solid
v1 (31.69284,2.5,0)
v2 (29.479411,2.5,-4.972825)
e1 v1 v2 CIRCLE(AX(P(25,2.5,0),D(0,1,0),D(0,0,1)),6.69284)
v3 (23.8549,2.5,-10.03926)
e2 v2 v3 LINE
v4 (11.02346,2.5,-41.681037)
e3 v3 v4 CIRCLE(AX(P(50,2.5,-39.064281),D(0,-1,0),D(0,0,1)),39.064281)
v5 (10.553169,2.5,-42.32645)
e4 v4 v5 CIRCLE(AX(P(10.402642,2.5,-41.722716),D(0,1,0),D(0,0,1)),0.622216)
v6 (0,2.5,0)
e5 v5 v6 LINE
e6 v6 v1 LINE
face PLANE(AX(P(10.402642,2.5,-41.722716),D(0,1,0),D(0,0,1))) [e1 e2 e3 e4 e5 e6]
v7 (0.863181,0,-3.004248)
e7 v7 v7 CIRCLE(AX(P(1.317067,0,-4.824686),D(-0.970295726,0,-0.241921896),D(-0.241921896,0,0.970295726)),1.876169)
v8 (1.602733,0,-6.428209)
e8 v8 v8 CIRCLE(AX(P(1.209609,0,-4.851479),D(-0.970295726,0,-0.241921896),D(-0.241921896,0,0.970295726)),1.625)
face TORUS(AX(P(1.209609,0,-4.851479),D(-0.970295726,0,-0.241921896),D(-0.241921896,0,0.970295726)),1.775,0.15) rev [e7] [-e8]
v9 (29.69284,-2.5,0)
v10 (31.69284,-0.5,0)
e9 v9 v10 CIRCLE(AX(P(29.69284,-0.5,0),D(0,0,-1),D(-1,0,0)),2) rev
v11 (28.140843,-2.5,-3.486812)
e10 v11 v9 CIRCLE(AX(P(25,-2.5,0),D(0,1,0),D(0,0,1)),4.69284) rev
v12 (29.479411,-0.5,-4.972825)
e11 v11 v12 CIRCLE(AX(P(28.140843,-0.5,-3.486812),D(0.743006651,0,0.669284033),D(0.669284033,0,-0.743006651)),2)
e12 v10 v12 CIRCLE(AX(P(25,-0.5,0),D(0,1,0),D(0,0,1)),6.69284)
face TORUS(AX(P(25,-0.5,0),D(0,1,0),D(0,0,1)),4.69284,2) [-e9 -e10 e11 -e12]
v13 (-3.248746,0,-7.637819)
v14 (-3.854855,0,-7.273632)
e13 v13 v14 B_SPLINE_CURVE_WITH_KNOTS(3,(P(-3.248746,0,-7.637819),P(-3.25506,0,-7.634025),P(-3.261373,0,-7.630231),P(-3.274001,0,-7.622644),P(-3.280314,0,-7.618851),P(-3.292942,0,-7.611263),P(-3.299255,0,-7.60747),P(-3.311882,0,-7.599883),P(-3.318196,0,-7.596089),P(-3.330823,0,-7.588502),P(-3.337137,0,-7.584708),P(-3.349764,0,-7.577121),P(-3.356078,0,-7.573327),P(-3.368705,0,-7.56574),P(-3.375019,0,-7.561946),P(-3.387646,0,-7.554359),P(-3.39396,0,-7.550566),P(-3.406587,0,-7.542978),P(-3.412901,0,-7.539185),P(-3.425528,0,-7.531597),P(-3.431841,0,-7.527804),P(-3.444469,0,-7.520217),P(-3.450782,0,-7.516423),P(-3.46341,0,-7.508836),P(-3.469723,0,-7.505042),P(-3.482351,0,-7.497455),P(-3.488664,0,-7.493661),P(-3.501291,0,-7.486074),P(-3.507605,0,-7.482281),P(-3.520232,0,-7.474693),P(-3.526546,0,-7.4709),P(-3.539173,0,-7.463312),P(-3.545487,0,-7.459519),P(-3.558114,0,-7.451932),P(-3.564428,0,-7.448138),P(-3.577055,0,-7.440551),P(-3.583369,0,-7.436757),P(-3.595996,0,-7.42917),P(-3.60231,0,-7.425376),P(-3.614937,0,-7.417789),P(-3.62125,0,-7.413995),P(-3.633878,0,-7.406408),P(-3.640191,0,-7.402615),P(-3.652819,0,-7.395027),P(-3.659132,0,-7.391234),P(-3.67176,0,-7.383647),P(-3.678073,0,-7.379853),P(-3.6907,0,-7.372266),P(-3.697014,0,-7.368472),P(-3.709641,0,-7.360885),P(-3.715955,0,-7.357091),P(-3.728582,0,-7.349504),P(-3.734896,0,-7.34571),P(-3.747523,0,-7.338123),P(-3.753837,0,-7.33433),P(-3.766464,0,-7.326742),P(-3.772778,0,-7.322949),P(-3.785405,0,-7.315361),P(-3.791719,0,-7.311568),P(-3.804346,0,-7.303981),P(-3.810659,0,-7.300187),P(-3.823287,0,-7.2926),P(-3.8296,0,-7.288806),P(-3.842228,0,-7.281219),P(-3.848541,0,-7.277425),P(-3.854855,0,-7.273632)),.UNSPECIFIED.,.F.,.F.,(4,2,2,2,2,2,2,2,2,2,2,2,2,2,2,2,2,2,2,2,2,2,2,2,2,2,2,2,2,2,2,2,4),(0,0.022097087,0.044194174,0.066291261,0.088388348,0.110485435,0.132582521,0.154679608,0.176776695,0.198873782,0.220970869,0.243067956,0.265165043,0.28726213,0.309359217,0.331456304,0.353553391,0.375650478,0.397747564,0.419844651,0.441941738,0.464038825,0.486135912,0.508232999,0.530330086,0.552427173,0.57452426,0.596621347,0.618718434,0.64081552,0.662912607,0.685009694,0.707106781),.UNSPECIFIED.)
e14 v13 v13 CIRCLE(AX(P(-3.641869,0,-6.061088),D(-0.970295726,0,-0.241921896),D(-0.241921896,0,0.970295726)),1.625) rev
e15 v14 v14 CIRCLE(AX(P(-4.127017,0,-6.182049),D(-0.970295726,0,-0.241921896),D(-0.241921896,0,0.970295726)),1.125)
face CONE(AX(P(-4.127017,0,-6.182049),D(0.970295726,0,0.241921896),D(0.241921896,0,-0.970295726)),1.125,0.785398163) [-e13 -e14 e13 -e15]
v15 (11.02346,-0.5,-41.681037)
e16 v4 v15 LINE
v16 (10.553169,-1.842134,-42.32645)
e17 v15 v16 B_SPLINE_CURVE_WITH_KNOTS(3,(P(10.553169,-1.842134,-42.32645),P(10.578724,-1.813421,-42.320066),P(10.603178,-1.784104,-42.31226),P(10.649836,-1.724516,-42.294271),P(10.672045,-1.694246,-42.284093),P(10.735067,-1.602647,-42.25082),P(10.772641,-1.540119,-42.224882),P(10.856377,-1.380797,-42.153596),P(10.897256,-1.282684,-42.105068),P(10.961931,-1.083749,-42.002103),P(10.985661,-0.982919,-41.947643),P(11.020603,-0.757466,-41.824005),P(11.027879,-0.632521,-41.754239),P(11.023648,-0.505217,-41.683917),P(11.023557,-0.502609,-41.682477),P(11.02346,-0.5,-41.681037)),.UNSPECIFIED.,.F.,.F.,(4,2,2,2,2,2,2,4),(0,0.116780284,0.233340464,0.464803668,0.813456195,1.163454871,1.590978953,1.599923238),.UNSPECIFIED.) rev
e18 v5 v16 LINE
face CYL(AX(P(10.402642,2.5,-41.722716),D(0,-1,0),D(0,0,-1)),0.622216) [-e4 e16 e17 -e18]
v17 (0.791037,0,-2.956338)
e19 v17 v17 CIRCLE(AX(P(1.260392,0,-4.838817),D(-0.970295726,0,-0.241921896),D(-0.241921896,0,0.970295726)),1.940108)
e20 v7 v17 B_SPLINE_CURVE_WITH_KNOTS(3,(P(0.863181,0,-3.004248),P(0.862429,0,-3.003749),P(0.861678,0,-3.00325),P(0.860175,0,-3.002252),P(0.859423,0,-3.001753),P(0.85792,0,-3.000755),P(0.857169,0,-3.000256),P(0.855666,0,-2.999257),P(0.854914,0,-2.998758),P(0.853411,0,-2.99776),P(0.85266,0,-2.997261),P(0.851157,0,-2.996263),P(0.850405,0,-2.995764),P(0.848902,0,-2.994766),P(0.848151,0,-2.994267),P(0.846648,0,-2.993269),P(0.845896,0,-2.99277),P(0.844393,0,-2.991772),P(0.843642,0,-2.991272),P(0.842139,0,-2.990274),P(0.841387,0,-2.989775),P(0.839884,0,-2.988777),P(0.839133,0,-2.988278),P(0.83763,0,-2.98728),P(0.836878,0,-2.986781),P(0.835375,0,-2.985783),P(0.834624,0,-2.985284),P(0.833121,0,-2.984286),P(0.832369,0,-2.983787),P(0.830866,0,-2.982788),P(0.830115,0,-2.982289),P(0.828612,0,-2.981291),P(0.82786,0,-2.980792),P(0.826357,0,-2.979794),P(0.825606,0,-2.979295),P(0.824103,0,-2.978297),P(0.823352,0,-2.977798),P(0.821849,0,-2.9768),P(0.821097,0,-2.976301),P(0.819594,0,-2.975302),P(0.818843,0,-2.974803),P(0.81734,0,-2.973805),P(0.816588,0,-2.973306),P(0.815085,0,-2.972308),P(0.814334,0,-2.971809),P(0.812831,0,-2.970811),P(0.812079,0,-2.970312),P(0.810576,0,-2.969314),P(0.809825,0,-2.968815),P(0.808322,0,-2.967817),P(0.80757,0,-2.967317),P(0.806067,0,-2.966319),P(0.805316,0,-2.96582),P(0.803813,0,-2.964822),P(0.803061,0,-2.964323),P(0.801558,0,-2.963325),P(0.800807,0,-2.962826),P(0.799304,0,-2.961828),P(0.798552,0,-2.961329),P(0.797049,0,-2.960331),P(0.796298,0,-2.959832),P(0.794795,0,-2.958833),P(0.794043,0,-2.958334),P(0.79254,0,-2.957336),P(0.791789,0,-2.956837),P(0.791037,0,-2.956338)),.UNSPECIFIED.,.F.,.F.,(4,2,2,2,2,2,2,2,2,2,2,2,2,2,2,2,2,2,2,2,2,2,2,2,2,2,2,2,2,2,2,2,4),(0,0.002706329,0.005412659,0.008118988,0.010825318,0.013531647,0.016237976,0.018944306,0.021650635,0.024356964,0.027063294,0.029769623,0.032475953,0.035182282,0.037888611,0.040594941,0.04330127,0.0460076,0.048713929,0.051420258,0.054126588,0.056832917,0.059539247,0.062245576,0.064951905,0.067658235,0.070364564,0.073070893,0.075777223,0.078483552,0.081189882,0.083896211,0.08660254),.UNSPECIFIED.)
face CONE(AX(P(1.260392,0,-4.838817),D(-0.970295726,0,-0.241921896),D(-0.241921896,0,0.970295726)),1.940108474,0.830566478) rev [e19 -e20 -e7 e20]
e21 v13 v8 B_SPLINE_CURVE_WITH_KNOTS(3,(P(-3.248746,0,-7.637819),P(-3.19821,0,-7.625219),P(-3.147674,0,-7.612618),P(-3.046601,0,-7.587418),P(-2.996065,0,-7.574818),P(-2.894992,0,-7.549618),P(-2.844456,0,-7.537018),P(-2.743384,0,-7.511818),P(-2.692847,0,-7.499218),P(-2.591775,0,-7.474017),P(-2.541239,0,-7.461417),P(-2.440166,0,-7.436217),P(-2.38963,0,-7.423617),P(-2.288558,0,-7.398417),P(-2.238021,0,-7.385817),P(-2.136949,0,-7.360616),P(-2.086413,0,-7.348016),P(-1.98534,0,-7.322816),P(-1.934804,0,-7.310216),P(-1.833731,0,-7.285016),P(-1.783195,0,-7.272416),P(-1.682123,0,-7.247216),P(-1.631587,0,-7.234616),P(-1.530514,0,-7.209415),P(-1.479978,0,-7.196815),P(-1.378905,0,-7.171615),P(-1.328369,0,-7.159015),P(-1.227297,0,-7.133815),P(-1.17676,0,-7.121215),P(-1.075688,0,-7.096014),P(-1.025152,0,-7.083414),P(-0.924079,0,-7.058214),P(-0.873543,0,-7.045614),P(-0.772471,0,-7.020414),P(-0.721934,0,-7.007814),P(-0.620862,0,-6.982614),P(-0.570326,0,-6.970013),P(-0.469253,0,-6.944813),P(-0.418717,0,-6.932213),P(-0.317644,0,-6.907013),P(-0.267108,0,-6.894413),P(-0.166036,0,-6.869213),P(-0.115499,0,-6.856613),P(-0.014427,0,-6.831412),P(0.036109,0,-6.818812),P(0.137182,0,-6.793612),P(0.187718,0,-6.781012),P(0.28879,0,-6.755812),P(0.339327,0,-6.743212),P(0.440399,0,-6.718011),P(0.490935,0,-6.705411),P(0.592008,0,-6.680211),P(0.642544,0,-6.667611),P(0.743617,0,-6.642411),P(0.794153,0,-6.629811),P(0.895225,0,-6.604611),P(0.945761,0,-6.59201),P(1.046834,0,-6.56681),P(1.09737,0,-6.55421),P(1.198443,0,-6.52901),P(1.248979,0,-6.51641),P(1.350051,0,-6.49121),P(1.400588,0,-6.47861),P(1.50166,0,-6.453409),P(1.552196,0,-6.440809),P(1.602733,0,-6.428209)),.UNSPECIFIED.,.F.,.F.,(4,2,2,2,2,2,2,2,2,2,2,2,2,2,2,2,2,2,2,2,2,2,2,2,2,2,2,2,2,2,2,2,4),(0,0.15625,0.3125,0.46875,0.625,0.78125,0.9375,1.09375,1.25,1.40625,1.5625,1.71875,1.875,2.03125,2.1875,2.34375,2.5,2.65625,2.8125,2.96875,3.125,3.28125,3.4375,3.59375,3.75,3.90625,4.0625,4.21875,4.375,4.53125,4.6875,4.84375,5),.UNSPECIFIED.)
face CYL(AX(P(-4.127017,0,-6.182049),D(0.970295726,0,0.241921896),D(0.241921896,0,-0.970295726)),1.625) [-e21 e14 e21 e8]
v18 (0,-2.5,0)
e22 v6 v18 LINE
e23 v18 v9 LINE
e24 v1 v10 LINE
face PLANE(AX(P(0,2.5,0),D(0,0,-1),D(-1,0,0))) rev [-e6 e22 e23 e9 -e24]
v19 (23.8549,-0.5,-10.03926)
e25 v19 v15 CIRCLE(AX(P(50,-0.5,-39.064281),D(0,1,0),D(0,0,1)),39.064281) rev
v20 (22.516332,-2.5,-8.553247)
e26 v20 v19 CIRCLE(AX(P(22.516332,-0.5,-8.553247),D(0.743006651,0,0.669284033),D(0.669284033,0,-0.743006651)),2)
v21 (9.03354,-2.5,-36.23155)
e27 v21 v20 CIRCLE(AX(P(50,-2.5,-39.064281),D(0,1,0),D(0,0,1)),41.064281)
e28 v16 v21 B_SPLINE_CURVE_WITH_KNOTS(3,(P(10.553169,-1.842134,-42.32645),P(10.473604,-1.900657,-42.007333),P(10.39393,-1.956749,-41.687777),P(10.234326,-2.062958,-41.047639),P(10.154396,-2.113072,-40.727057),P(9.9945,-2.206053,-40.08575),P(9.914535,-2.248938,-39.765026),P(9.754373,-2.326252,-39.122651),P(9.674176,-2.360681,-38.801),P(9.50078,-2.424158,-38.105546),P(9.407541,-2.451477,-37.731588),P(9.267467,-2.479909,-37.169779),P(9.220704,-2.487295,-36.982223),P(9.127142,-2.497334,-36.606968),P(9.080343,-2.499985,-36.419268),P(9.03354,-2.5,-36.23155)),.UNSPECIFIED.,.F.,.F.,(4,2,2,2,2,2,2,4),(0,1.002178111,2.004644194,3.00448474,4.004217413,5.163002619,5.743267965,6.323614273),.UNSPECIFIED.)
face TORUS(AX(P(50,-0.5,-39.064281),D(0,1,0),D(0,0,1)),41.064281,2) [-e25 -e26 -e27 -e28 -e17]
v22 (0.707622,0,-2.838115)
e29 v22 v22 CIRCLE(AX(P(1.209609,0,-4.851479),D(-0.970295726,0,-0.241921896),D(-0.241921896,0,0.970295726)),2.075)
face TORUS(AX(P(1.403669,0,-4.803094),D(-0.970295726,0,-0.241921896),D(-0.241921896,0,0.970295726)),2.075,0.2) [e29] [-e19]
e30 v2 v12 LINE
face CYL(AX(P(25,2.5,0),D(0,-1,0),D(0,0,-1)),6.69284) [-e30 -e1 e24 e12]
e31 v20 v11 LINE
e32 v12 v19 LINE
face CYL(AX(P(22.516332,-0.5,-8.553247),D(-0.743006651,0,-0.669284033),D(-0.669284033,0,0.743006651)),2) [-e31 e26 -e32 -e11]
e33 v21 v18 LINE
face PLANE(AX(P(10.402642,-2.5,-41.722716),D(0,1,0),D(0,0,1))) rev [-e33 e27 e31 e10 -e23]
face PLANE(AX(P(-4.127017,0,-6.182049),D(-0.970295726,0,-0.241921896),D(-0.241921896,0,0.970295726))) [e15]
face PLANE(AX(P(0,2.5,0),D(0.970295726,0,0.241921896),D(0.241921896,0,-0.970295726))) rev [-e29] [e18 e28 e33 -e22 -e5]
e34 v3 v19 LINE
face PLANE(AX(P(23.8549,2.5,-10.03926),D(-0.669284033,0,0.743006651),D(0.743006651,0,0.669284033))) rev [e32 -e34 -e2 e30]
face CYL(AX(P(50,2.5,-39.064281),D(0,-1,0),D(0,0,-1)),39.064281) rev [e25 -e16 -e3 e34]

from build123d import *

# Parameters (mm, degrees)
BOSS_EXTRUDE1_DEPTH = 2.5
SKETCH2_R           = 1.625
BOSS_EXTRUDE2_DEPTH = 5.5
CHAMFER1_SIZE       = 0.5
FILLET2_R           = 2


with BuildPart() as part:
    # Sketch1 → Boss-Extrude1 (new, symmetric)
    with BuildSketch(Plane(origin=(0, 0, 0), x_dir=(1, 0, 0), z_dir=(0, 1, 0))):
        with BuildLine():
            Line((0, 0), (31.692840332, 0))
            ThreePointArc((31.692840332, 0), (31.114494888, 2.721592177), (29.479411171, 4.972824878))
            Line((29.479411171, 4.972824878), (23.85490024, 10.039260498))
            ThreePointArc((23.85490024, 10.039260498), (13.799067859, 24.384002459), (11.023460035, 41.68103654))
            ThreePointArc((11.023460035, 41.68103654), (10.905516567, 42.089144278), (10.553169202, 42.326449823))
            Line((10.553169202, 42.326449823), (0, 0))
        make_face()
    extrude(amount=BOSS_EXTRUDE1_DEPTH, both=True)

    # Sketch2 → Boss-Extrude2 (add)
    with BuildSketch(Plane(origin=(0, 0, 0), x_dir=(-0.24192189559966498, 0, 0.9702957262759973), z_dir=(-0.9702957262759971, 0, -0.24192189559966495))):
        with Locations(Location((-5, 0, 0), (0, 0, 180))):
            Circle(SKETCH2_R)
    extrude(amount=BOSS_EXTRUDE2_DEPTH)

    # Chamfer1
    chamfer1_edges = [part.edges().sort_by_distance(p)[0] for p in [
        (-4.520140097, 0, -4.605318502),
    ]]
    chamfer(chamfer1_edges, length=CHAMFER1_SIZE)

    # Sketch3 → Cut-Revolve4 (revolve, cut)
    with BuildSketch(Plane(origin=(0, 0, 0), x_dir=(1, 0, 0), z_dir=(0, 1, 0))):
        with BuildLine():
            Line((0.816486398, 3.274748076), (0.707621545, 2.838114999))
            ThreePointArc((0.707621545, 2.838114999), (0.73826383, 2.905034263), (0.791037406, 2.956338134))
            Line((0.791037406, 2.956338134), (0.863180576, 3.004248082))
            ThreePointArc((0.863180576, 3.004248082), (0.928011981, 3.154719604), (0.816486398, 3.274748076))
        make_face()
    revolve(axis=Axis((-4.382099311, 0, -6.245648216), (0.9702957262759973, 0, 0.2419218955996649)), mode=Mode.SUBTRACT)

    # Fillet2
    # the kernel refuses this fillet: 2 mm, written as the material it takes off along each edge
    with BuildSketch(Plane(origin=(25, -2.5, 0), x_dir=(0.7336270149477808, 0, 0.6795523548180881), z_dir=(-0.6795523548180881, 0, 0.7336270149477808))) as fillet2_piece_1:
        with BuildLine():
            CenterArc((6.692840332 - FILLET2_R, FILLET2_R), FILLET2_R, 270, 90)
            Line((6.692840332, FILLET2_R), (6.692840332, 0))
            Line((6.692840332, 0), (6.692840332 - FILLET2_R, 0))
        make_face()
    revolve(axis=Axis((25, -2.5, 0), (0, 1, 0)), revolution_arc=90.796842199, mode=Mode.SUBTRACT)
    with BuildSketch(Plane(origin=(29.479411171, -2.5, -4.972824878), x_dir=(-0.6692840332038654, 0, 0.7430066506420836), z_dir=(-0.7430066506420837, 0, -0.6692840332038654))) as fillet2_piece_2:
        with BuildLine():
            CenterArc((FILLET2_R, FILLET2_R), FILLET2_R, 180, 90)
            Line((0, FILLET2_R), (0, 0))
            Line((0, 0), (FILLET2_R, 0))
        make_face()
    extrude(amount=7.569933494, mode=Mode.SUBTRACT)
    with BuildSketch(Plane(origin=(50, -2.5, -39.064281325), x_dir=(-0.6692840332038644, 0, 0.7430066506420845), z_dir=(0.7430066506420845, 0, 0.6692840332038644))) as fillet2_piece_3:
        with BuildLine():
            CenterArc((39.064281325 + FILLET2_R, -FILLET2_R), FILLET2_R, 90, 90)
            Line((39.064281325, -FILLET2_R), (39.064281325, 0))
            Line((39.064281325, 0), (39.064281325 + FILLET2_R, 0))
        make_face()
    revolve(axis=Axis((50, -2.5, -39.064281325), (0, -1, 0)), revolution_arc=59.163556195, mode=Mode.SUBTRACT)


solid = part.part
